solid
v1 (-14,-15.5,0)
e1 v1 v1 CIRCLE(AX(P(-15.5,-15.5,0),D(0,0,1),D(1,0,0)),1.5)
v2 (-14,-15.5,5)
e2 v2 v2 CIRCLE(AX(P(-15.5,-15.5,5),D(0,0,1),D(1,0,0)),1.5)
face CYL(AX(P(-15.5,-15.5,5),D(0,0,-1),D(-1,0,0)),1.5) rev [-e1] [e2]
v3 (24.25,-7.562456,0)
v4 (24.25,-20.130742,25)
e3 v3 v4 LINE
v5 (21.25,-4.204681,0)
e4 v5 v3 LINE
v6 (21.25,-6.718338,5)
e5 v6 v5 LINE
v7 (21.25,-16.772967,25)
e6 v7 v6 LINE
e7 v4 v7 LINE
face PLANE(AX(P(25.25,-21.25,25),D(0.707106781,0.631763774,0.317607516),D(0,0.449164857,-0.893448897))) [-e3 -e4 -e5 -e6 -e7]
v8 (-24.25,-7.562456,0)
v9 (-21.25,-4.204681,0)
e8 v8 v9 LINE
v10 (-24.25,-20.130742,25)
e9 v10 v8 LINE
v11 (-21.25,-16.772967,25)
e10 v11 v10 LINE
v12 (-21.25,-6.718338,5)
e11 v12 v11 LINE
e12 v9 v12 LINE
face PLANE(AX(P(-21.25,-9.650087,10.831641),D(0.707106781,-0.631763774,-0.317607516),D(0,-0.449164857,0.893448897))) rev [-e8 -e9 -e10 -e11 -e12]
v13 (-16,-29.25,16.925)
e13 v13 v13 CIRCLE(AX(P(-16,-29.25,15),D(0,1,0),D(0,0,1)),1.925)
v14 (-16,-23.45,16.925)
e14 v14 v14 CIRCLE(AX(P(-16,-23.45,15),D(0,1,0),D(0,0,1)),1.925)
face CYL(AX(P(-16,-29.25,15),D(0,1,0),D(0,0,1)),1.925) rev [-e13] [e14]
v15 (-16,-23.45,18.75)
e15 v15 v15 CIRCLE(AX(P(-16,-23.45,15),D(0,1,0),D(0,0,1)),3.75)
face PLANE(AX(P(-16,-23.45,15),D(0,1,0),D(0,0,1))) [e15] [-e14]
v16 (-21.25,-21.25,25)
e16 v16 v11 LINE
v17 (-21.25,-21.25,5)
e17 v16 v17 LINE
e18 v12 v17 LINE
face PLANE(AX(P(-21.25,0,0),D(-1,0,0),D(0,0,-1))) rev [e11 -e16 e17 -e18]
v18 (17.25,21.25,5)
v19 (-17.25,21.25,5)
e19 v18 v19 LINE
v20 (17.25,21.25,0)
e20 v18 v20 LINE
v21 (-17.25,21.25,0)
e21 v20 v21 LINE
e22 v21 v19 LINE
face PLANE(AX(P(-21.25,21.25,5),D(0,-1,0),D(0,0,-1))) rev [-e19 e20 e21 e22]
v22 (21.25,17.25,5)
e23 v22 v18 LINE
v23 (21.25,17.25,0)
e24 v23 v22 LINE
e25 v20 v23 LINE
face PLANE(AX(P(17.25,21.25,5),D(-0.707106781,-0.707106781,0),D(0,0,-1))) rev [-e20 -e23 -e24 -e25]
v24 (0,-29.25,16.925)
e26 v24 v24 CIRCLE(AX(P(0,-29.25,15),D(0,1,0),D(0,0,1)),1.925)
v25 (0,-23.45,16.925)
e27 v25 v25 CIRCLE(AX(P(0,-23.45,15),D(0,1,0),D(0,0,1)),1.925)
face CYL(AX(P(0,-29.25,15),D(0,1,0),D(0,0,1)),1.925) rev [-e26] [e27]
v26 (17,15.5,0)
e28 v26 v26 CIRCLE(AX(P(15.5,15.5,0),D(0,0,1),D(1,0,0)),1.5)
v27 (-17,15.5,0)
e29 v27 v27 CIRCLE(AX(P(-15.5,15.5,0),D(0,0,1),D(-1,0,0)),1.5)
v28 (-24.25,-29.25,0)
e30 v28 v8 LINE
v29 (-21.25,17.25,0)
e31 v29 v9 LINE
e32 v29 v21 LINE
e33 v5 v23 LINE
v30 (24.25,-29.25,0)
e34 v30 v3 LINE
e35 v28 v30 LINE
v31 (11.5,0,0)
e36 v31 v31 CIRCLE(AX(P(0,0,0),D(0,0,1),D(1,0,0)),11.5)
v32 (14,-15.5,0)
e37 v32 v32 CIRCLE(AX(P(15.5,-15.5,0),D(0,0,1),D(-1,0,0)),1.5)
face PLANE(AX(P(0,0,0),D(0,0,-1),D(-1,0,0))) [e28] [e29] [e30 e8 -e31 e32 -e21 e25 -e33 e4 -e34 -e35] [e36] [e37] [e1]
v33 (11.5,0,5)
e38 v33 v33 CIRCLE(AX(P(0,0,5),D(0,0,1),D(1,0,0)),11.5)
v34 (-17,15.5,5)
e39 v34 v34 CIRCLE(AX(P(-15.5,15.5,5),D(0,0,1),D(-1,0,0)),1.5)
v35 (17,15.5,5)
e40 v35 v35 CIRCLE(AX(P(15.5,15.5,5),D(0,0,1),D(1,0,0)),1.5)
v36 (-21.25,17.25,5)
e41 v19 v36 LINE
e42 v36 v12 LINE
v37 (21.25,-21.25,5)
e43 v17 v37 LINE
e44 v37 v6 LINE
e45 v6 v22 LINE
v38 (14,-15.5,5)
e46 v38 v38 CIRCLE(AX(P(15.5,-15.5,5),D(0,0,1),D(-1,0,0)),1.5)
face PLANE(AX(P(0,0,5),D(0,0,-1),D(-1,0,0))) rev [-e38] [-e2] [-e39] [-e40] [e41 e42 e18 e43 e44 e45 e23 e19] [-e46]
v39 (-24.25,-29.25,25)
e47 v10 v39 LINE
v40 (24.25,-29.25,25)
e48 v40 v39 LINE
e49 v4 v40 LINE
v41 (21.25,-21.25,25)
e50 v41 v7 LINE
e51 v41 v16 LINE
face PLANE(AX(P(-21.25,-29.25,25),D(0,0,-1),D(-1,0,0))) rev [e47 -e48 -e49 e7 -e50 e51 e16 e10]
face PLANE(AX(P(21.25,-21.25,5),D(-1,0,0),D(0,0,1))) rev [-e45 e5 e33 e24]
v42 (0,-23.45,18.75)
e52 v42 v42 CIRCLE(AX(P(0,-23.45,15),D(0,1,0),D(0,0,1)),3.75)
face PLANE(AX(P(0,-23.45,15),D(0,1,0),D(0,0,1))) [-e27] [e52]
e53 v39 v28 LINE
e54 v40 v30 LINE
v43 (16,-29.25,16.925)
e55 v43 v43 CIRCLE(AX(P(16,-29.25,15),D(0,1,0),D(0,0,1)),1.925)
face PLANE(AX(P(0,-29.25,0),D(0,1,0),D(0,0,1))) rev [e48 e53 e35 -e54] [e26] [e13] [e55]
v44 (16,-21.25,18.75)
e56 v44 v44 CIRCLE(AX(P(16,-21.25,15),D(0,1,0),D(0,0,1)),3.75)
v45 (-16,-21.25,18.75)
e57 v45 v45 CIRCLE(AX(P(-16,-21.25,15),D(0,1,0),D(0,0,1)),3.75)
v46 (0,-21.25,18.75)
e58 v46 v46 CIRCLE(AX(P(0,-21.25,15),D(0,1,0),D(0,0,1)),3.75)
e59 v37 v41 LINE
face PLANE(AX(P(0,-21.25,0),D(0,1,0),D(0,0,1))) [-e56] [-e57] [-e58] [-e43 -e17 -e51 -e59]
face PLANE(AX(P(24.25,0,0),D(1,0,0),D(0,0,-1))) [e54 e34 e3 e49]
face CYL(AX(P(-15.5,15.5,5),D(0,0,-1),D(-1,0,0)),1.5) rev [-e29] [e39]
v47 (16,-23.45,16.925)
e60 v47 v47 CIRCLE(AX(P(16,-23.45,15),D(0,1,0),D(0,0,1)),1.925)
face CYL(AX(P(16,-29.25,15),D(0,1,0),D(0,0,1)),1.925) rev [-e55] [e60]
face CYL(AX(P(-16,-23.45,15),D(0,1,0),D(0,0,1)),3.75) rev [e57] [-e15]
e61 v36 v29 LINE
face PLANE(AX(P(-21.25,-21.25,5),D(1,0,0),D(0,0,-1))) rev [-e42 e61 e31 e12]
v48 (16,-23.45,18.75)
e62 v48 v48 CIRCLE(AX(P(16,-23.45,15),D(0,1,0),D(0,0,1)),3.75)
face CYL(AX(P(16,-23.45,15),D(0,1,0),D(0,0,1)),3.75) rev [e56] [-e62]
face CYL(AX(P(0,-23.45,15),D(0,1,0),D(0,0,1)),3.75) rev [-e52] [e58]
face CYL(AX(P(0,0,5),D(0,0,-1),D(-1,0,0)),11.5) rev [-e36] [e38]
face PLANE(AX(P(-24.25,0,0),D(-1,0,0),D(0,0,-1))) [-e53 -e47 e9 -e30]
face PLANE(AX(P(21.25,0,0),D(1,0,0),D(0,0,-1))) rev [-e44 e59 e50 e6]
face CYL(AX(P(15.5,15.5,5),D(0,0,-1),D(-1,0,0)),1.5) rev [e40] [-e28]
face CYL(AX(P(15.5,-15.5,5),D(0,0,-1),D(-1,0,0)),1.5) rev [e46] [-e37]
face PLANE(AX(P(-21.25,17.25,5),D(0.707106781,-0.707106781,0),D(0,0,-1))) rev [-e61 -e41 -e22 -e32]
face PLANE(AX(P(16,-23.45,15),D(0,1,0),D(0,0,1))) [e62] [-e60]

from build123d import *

# Parameters (mm, degrees)
SKETCH1_W           = 42.5
SKETCH1_H           = 42.5
SKETCH1_R           = 1.5
SKETCH1_R_2         = 11.5
BOSS_EXTRUDE1_DEPTH = 5
CHAMFER1_SIZE       = 4
SKETCH2_W           = 42.5
SKETCH2_H           = 25
BOSS_EXTRUDE2_DEPTH = 8
BOSS_EXTRUDE3_DEPTH = 3
SKETCH4_R           = 3.75
CUT_EXTRUDE1_DEPTH  = 2.2
SKETCH5_R           = 1.925
CUT_EXTRUDE2_DEPTH  = 57.667031862


with BuildPart() as part:
    # Sketch1 → Boss-Extrude1 (new body)
    with BuildSketch(Plane.XY):
        Rectangle(SKETCH1_W, SKETCH1_H)
        with Locations((15.5, 15.5)):
            Circle(SKETCH1_R, mode=Mode.SUBTRACT)
        with Locations(Location((-15.5, 15.5, 0), (0, 0, 180))):
            Circle(SKETCH1_R, mode=Mode.SUBTRACT)
        with Locations(Location((15.5, -15.5, 0), (0, 0, 180))):
            Circle(SKETCH1_R, mode=Mode.SUBTRACT)
        with Locations((-15.5, -15.5)):
            Circle(SKETCH1_R, mode=Mode.SUBTRACT)
        Circle(SKETCH1_R_2, mode=Mode.SUBTRACT)
    extrude(amount=BOSS_EXTRUDE1_DEPTH)

    # Chamfer1
    chamfer1_edges = [part.edges().sort_by_distance(p)[0] for p in [
        (-21.25, 21.25, 2.5),
        (21.25, 21.25, 2.5),
    ]]
    chamfer(chamfer1_edges, length=CHAMFER1_SIZE)

    # Sketch2 → Boss-Extrude2 (add)
    with BuildSketch(Plane.XZ.offset(21.25)):
        with Locations((0, 12.5)):
            Rectangle(SKETCH2_W, SKETCH2_H)
    extrude(amount=BOSS_EXTRUDE2_DEPTH)

    # Sketch3 → Boss-Extrude3 (add)
    with BuildSketch(Plane(origin=(21.25, 0, 0), x_dir=(0, 0, -1), z_dir=(1, 0, 0))):
        Polygon((-25, -21.25), (0, -8.681713823), (0, -29.25), (-25, -29.25), align=None)
    boss_extrude3 = extrude(amount=BOSS_EXTRUDE3_DEPTH)

    # Mirror3: Boss-Extrude3 across plane
    add(boss_extrude3.mirror(Plane(origin=(0, 0, 0), x_dir=(0, 0, 1), z_dir=(1, 0, 0))))

    # Chamfer2
    # the kernel refuses this chamfer: 4 mm, written as the material it adds along each edge
    with BuildSketch(Plane(origin=(-21.25, -22.284423421, 27.057606356), x_dir=(-0.9996219169112968, -0.02456616062709099, -0.012350181481602638), z_dir=(0, 0.44916485684431295, -0.8934488969023511))) as chamfer2_piece_1_section:
        with BuildLine():
            Line((4.114692781, 0), (-0.22618862, 4.108471174))
            Line((-0.22618862, 4.108471174), (-0.306158373, 4.106271504))
            ThreePointArc((-0.306158373, 4.106271504), (-0.136516908, 2.053591319), (-0.079969753, -0.00219967))
            Line((-0.079969753, -0.00219967), (0.00219967, -0.079969753))
            ThreePointArc((0.00219967, -0.079969753), (2.057990659, -0.023422598), (4.116892451, -0.079969753))
            Line((4.116892451, -0.079969753), (4.114692781, 0))
        make_face()
    chamfer2_piece_1 = extrude(amount=54.972604346, mode=Mode.PRIVATE)
    chamfer2_piece_1 = split(chamfer2_piece_1, bisect_by=Plane(origin=(-24.25, -14.705039529, 15), z_dir=(1, 0, 0)), keep=Keep.TOP, mode=Mode.PRIVATE)
    chamfer2_piece_1 = split(chamfer2_piece_1, bisect_by=Plane(origin=(-22.462839724, -14.705039529, 25), z_dir=(0, 0, -1)), keep=Keep.TOP, mode=Mode.PRIVATE)
    chamfer2_piece_1 = split(chamfer2_piece_1, bisect_by=Plane(origin=(-21.25, -14.705039529, 15), z_dir=(-1, 0, 0)), keep=Keep.TOP, mode=Mode.PRIVATE)
    chamfer2_piece_1 = split(chamfer2_piece_1, bisect_by=Plane(origin=(-22.462839724, -14.705039529, 5), z_dir=(0, 0, 1)), keep=Keep.TOP, mode=Mode.PRIVATE)
    add(chamfer2_piece_1)
    with BuildSketch(Plane(origin=(-21.25, -22.284423421, 27.057606356), x_dir=(-0.9996219169112968, -0.02456616062709099, -0.012350181481602638), z_dir=(0, 0.44916485684431295, -0.8934488969023511))) as chamfer2_piece_2_section:
        with BuildLine():
            Line((4.114692781, 0), (-0.22618862, 4.108471174))
            Line((-0.22618862, 4.108471174), (-0.306158373, 4.106271504))
            ThreePointArc((-0.306158373, 4.106271504), (-0.136516908, 2.053591319), (-0.079969753, -0.00219967))
            Line((-0.079969753, -0.00219967), (0.00219967, -0.079969753))
            ThreePointArc((0.00219967, -0.079969753), (2.057990659, -0.023422598), (4.116892451, -0.079969753))
            Line((4.116892451, -0.079969753), (4.114692781, 0))
        make_face()
    chamfer2_piece_2 = extrude(amount=54.972604346, mode=Mode.PRIVATE)
    chamfer2_piece_2 = split(chamfer2_piece_2, bisect_by=Plane(origin=(-24.25, -8.42089644, 2.5), z_dir=(1, 0, 0)), keep=Keep.TOP, mode=Mode.PRIVATE)
    chamfer2_piece_2 = split(chamfer2_piece_2, bisect_by=Plane(origin=(-22.462839724, -8.42089644, 0), z_dir=(0, 0, 1)), keep=Keep.TOP, mode=Mode.PRIVATE)
    chamfer2_piece_2 = split(chamfer2_piece_2, bisect_by=Plane(origin=(-21.25, -8.42089644, 2.5), z_dir=(-1, 0, 0)), keep=Keep.TOP, mode=Mode.PRIVATE)
    chamfer2_piece_2 = split(chamfer2_piece_2, bisect_by=Plane(origin=(-22.462839724, -8.42089644, 5), z_dir=(0, 0, -1)), keep=Keep.TOP, mode=Mode.PRIVATE)
    add(chamfer2_piece_2)
    with BuildSketch(Plane(origin=(-21.25, -22.284423421, 27.057606356), x_dir=(-0.9996219169112968, -0.02456616062709099, -0.012350181481602638), z_dir=(0, 0.44916485684431295, -0.8934488969023511))) as chamfer2_piece_3_section:
        with BuildLine():
            Line((4.114692781, 0), (-0.22618862, 4.108471174))
            Line((-0.22618862, 4.108471174), (-0.306158373, 4.106271504))
            ThreePointArc((-0.306158373, 4.106271504), (-0.136516908, 2.053591319), (-0.079969753, -0.00219967))
            Line((-0.079969753, -0.00219967), (0.00219967, -0.079969753))
            ThreePointArc((0.00219967, -0.079969753), (2.057990659, -0.023422598), (4.116892451, -0.079969753))
            Line((4.116892451, -0.079969753), (4.114692781, 0))
        make_face()
    chamfer2_piece_3 = extrude(amount=54.972604346, mode=Mode.PRIVATE)
    chamfer2_piece_3 = split(chamfer2_piece_3, bisect_by=Plane(origin=(-21.193688037, -7.24875826, 0), z_dir=(0, 0, 1)), keep=Keep.TOP, mode=Mode.PRIVATE)
    chamfer2_piece_3 = split(chamfer2_piece_3, bisect_by=Plane(origin=(-21.25, -7.24875826, 2.5), z_dir=(1, 0, 0)), keep=Keep.TOP, mode=Mode.PRIVATE)
    chamfer2_piece_3 = split(chamfer2_piece_3, bisect_by=Plane(origin=(-21.193688037, -7.24875826, 5), z_dir=(0, 0, -1)), keep=Keep.TOP, mode=Mode.PRIVATE)
    add(chamfer2_piece_3)
    with BuildSketch(Plane(origin=(21.25, -22.284423421, 27.057606356), x_dir=(-0.027495876610586504, 0.8931110989838116, 0.4489950352079003), z_dir=(0, 0.44916485684431295, -0.8934488969023511))) as chamfer2_piece_4_section:
        with BuildLine():
            Line((4.114692781, 0), (-0.22618862, 4.108471174))
            Line((-0.22618862, 4.108471174), (-0.306158373, 4.106271504))
            ThreePointArc((-0.306158373, 4.106271504), (-0.136516908, 2.053591319), (-0.079969753, -0.00219967))
            Line((-0.079969753, -0.00219967), (0.00219967, -0.079969753))
            ThreePointArc((0.00219967, -0.079969753), (2.057990659, -0.023422598), (4.116892451, -0.079969753))
            Line((4.116892451, -0.079969753), (4.114692781, 0))
        make_face()
    chamfer2_piece_4 = extrude(amount=54.972604346, mode=Mode.PRIVATE)
    chamfer2_piece_4 = split(chamfer2_piece_4, bisect_by=Plane(origin=(22.462839724, -14.705039529, 5), z_dir=(0, 0, 1)), keep=Keep.TOP, mode=Mode.PRIVATE)
    chamfer2_piece_4 = split(chamfer2_piece_4, bisect_by=Plane(origin=(22.462839724, -14.705039529, 25), z_dir=(0, 0, -1)), keep=Keep.TOP, mode=Mode.PRIVATE)
    chamfer2_piece_4 = split(chamfer2_piece_4, bisect_by=Plane(origin=(21.25, -14.705039529, 15), z_dir=(1, 0, 0)), keep=Keep.TOP, mode=Mode.PRIVATE)
    chamfer2_piece_4 = split(chamfer2_piece_4, bisect_by=Plane(origin=(24.25, -14.705039529, 15), z_dir=(-1, 0, 0)), keep=Keep.TOP, mode=Mode.PRIVATE)
    add(chamfer2_piece_4)
    with BuildSketch(Plane(origin=(21.25, -22.284423421, 27.057606356), x_dir=(-0.027495876610586504, 0.8931110989838116, 0.4489950352079003), z_dir=(0, 0.44916485684431295, -0.8934488969023511))) as chamfer2_piece_5_section:
        with BuildLine():
            Line((4.114692781, 0), (-0.22618862, 4.108471174))
            Line((-0.22618862, 4.108471174), (-0.306158373, 4.106271504))
            ThreePointArc((-0.306158373, 4.106271504), (-0.136516908, 2.053591319), (-0.079969753, -0.00219967))
            Line((-0.079969753, -0.00219967), (0.00219967, -0.079969753))
            ThreePointArc((0.00219967, -0.079969753), (2.057990659, -0.023422598), (4.116892451, -0.079969753))
            Line((4.116892451, -0.079969753), (4.114692781, 0))
        make_face()
    chamfer2_piece_5 = extrude(amount=54.972604346, mode=Mode.PRIVATE)
    chamfer2_piece_5 = split(chamfer2_piece_5, bisect_by=Plane(origin=(21.193688037, -7.24875826, 0), z_dir=(0, 0, 1)), keep=Keep.TOP, mode=Mode.PRIVATE)
    chamfer2_piece_5 = split(chamfer2_piece_5, bisect_by=Plane(origin=(21.193688037, -7.24875826, 5), z_dir=(0, 0, -1)), keep=Keep.TOP, mode=Mode.PRIVATE)
    chamfer2_piece_5 = split(chamfer2_piece_5, bisect_by=Plane(origin=(21.25, -7.24875826, 2.5), z_dir=(-1, 0, 0)), keep=Keep.TOP, mode=Mode.PRIVATE)
    add(chamfer2_piece_5)
    with BuildSketch(Plane(origin=(21.25, -22.284423421, 27.057606356), x_dir=(-0.027495876610586504, 0.8931110989838116, 0.4489950352079003), z_dir=(0, 0.44916485684431295, -0.8934488969023511))) as chamfer2_piece_6_section:
        with BuildLine():
            Line((4.114692781, 0), (-0.22618862, 4.108471174))
            Line((-0.22618862, 4.108471174), (-0.306158373, 4.106271504))
            ThreePointArc((-0.306158373, 4.106271504), (-0.136516908, 2.053591319), (-0.079969753, -0.00219967))
            Line((-0.079969753, -0.00219967), (0.00219967, -0.079969753))
            ThreePointArc((0.00219967, -0.079969753), (2.057990659, -0.023422598), (4.116892451, -0.079969753))
            Line((4.116892451, -0.079969753), (4.114692781, 0))
        make_face()
    chamfer2_piece_6 = extrude(amount=54.972604346, mode=Mode.PRIVATE)
    chamfer2_piece_6 = split(chamfer2_piece_6, bisect_by=Plane(origin=(22.462839724, -8.42089644, 0), z_dir=(0, 0, 1)), keep=Keep.TOP, mode=Mode.PRIVATE)
    chamfer2_piece_6 = split(chamfer2_piece_6, bisect_by=Plane(origin=(22.462839724, -8.42089644, 5), z_dir=(0, 0, -1)), keep=Keep.TOP, mode=Mode.PRIVATE)
    chamfer2_piece_6 = split(chamfer2_piece_6, bisect_by=Plane(origin=(21.25, -8.42089644, 2.5), z_dir=(1, 0, 0)), keep=Keep.TOP, mode=Mode.PRIVATE)
    chamfer2_piece_6 = split(chamfer2_piece_6, bisect_by=Plane(origin=(24.25, -8.42089644, 2.5), z_dir=(-1, 0, 0)), keep=Keep.TOP, mode=Mode.PRIVATE)
    add(chamfer2_piece_6)

    # Sketch4 → Cut-Extrude1 (cut)
    with BuildSketch(Plane(origin=(0, -21.25, 0), x_dir=(1, 0, 0), z_dir=(0, 1, 0))):
        with Locations(Location((0, -15, 0), (0, 0, 270))):
            Circle(SKETCH4_R)
        with Locations(Location((16, -15, 0), (0, 0, 270))):
            Circle(SKETCH4_R)
        with Locations(Location((-16, -15, 0), (0, 0, 270))):
            Circle(SKETCH4_R)
    extrude(amount=-CUT_EXTRUDE1_DEPTH, mode=Mode.SUBTRACT)

    # Sketch5 → Cut-Extrude2 (cut, through all)
    with BuildSketch(Plane(origin=(0, -23.45, 0), x_dir=(1, 0, 0), z_dir=(0, 1, 0))):
        with Locations(Location((0, -15, 0), (0, 0, 270))):
            Circle(SKETCH5_R)
        with Locations(Location((16, -15, 0), (0, 0, 270))):
            Circle(SKETCH5_R)
        with Locations(Location((-16, -15, 0), (0, 0, 270))):
            Circle(SKETCH5_R)
    extrude(amount=-CUT_EXTRUDE2_DEPTH, mode=Mode.SUBTRACT)


solid = part.part
